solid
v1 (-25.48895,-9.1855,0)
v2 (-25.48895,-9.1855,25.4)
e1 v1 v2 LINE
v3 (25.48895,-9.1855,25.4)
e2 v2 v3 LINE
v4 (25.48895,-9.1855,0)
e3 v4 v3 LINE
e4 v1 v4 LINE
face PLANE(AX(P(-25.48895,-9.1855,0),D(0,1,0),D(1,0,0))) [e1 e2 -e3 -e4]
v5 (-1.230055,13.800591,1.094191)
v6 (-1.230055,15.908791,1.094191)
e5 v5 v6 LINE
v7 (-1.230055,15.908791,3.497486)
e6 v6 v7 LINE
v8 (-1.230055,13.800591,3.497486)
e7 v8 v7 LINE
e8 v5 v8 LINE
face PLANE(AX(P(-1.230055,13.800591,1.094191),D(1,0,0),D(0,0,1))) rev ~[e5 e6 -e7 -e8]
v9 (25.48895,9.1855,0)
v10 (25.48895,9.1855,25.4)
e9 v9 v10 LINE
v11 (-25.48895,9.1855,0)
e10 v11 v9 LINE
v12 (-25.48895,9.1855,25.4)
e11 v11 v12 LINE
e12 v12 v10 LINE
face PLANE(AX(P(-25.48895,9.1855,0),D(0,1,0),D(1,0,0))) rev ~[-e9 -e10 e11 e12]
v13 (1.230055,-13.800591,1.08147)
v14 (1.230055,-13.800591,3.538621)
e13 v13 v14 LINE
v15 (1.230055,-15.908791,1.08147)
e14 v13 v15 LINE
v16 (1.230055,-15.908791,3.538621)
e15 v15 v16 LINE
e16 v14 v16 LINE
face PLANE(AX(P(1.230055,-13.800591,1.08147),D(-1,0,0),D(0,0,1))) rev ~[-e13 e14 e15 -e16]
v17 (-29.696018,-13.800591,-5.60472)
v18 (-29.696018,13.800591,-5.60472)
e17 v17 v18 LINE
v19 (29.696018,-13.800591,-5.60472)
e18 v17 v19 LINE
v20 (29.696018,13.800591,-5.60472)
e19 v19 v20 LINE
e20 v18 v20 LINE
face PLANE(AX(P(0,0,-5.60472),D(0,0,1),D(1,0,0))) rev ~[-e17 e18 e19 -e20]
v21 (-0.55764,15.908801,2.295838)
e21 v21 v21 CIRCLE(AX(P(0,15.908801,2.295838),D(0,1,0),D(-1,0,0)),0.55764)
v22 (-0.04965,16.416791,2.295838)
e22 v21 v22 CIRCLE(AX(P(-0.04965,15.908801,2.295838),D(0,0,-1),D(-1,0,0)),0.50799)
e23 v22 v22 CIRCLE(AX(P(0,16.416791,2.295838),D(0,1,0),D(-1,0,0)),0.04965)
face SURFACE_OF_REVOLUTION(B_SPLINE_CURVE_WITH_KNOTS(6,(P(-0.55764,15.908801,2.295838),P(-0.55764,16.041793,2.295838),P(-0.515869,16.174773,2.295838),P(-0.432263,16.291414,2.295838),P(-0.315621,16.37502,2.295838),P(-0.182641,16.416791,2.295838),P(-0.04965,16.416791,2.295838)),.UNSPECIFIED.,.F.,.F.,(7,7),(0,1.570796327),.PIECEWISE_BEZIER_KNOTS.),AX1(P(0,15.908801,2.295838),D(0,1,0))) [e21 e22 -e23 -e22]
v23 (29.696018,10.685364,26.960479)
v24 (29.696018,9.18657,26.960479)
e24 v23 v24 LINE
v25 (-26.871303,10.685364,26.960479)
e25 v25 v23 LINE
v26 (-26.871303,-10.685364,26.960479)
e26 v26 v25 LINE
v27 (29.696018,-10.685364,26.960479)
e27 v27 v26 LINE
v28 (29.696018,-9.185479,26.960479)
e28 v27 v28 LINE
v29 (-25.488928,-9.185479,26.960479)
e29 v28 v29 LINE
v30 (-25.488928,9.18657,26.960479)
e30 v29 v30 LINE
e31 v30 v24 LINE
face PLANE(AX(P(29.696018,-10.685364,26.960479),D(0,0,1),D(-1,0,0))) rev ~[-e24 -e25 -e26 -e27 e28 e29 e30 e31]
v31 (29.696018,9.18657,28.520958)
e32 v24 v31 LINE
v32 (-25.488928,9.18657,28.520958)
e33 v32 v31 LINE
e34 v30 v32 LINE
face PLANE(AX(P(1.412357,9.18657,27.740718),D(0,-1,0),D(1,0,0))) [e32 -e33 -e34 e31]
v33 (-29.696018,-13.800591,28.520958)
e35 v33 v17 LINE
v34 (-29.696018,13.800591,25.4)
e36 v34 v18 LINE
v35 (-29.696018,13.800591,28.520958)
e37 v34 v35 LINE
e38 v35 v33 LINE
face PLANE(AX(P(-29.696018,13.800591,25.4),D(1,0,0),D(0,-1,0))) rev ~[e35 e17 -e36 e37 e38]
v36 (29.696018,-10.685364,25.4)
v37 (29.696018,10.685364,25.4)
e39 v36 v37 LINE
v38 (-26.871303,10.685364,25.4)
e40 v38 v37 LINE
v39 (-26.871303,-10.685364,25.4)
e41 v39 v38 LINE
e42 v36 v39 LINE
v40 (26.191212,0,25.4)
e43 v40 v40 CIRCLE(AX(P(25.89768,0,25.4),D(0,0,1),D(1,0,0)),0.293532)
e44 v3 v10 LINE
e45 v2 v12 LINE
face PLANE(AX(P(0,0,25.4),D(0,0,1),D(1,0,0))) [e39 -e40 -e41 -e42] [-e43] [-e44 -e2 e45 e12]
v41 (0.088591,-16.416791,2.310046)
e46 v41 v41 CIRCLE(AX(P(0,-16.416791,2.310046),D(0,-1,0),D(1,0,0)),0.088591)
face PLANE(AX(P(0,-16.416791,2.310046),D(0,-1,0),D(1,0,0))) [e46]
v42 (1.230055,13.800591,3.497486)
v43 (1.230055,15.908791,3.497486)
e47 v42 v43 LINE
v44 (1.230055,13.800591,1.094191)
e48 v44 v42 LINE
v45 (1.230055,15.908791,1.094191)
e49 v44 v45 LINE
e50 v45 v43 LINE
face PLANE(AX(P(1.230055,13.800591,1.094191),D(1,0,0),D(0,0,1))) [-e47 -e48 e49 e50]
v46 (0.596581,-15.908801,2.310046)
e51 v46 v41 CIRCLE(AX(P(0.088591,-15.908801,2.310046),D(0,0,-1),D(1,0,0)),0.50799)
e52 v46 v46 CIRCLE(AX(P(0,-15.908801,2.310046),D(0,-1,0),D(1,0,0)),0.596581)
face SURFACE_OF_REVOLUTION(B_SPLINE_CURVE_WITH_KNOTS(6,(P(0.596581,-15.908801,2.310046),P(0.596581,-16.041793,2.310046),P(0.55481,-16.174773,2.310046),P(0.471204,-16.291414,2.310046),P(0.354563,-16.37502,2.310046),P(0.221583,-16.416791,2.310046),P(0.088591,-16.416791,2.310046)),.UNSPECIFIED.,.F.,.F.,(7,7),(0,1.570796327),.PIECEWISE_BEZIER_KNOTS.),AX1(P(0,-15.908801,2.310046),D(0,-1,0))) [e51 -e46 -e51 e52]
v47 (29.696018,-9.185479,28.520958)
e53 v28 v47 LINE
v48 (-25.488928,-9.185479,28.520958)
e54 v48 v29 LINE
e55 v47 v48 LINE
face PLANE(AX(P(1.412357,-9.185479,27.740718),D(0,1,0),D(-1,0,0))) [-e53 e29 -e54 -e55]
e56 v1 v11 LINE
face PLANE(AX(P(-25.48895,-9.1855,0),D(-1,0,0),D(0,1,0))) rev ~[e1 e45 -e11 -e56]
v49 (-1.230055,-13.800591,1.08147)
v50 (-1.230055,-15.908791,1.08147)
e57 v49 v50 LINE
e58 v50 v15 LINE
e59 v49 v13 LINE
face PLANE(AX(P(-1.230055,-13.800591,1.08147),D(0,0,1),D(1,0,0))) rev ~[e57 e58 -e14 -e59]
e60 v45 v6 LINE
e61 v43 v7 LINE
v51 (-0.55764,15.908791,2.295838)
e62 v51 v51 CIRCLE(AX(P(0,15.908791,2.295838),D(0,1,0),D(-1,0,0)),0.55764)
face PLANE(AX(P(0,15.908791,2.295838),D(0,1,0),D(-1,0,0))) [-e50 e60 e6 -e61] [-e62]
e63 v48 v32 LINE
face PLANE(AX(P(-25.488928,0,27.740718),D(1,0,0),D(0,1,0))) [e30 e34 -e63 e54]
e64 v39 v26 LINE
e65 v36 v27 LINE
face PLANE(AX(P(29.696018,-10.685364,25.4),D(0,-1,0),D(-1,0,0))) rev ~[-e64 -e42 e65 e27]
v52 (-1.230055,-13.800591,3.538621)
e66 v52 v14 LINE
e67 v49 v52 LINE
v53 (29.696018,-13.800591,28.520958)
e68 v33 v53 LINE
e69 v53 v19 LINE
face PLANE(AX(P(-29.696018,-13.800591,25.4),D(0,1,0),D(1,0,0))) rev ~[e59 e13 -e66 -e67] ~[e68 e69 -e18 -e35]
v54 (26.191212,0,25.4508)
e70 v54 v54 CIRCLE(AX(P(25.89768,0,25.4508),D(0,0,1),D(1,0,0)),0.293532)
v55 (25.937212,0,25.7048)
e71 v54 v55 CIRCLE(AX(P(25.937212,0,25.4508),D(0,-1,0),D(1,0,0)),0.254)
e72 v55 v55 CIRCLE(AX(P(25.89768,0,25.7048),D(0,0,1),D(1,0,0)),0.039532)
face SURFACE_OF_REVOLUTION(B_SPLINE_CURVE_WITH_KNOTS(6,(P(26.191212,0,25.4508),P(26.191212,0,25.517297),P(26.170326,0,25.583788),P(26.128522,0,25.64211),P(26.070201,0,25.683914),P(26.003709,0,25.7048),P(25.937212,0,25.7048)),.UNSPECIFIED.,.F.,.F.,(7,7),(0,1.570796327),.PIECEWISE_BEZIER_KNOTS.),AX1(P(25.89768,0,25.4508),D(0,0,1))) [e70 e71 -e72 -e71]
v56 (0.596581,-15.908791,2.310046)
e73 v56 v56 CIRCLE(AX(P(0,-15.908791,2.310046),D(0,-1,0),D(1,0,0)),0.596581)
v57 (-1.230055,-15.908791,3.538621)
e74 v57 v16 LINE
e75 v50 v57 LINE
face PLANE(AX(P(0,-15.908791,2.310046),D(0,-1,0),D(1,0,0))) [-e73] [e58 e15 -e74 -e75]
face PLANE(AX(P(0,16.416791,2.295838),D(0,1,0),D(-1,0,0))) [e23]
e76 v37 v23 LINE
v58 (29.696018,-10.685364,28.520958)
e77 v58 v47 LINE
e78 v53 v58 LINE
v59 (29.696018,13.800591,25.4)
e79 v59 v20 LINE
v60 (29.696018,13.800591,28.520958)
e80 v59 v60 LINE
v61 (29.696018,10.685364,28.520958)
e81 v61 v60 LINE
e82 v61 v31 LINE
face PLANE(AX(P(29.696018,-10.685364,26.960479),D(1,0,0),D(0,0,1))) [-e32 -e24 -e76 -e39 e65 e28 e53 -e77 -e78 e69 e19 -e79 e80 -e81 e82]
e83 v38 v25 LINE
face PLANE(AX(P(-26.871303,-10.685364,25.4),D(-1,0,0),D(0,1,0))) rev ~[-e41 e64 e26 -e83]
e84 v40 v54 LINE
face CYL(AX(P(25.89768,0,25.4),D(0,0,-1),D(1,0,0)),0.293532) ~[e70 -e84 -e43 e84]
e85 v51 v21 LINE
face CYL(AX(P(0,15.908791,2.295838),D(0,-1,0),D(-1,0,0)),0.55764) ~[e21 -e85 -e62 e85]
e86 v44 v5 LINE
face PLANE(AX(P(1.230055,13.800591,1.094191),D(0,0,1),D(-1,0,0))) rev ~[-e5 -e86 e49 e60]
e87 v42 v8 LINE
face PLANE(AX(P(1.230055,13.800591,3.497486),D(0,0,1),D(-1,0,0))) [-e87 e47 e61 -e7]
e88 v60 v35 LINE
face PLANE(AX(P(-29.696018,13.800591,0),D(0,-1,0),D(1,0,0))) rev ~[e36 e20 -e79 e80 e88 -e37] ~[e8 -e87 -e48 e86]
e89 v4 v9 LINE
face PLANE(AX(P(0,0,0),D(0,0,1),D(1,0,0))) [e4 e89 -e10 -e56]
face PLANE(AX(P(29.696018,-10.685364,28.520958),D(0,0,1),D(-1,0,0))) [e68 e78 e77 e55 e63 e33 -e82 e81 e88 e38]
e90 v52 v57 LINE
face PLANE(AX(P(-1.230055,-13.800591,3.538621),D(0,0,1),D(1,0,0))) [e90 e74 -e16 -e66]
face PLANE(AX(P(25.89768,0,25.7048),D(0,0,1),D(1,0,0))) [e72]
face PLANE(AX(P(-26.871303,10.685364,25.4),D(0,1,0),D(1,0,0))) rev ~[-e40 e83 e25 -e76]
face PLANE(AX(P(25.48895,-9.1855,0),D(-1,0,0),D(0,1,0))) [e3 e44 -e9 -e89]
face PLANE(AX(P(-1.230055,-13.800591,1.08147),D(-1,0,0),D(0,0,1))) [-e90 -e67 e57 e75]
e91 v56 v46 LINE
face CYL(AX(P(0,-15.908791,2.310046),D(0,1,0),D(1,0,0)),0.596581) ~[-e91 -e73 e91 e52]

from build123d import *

# Parameters (mm, degrees)
F1_W      = 59.3920350075
F1_H      = 27.6011824608
F1_W_2    = 50.9779006243
F1_H_2    = 18.371000886
F2_DEPTH  = 25.4
F0_W      = 59.3920350075
F0_H      = 27.6011824608
F3_DEPTH  = 5.604719976
F18_DEPTH = 3.1209578738
F6_W      = 56.5673206002
F6_H      = 1.5604789369
F7_DEPTH  = 1.4987937175
F8_W      = 56.5673206002
F8_H      = 1.5604789369
F19_DEPTH = 1.4998847619
F5_W      = 21.3707275689
F5_H      = 1.5604789369
F9_DEPTH  = 1.382375136
F20_R     = 0.2935322564
F10_DEPTH = 0.3048
F21_R     = 0.254
F22_W     = 2.4601090699
F22_H     = 2.4032953017
F11_DEPTH = 2.1082
F12_R     = 0.5576398104
F13_DEPTH = 0.508
F14_R     = 0.50799
F23_W     = 2.4601090699
F23_H     = 2.4571502453
F15_DEPTH = 2.1082
F24_R     = 0.5965812211
F16_DEPTH = 0.508
F17_R     = 0.50799


# Not quite as in the source:
# - a fillet or chamfer is up to 0.001 mm smaller than in the source, because OpenCascade refuses the exact size


with BuildPart() as f2:
    # F1 (on face) → F2 (new body)
    with BuildSketch(Plane.XY):
        Rectangle(F1_W, F1_H)
        Rectangle(F1_W_2, F1_H_2, mode=Mode.SUBTRACT)
    extrude(amount=F2_DEPTH)

    # F0 (on Top) → F3 (join)
    with BuildSketch(Plane.XY):
        Rectangle(F0_W, F0_H)
    extrude(amount=-F3_DEPTH)

    # F4 (on face) → F18 (join)
    with BuildSketch(Plane.XY.offset(25.4)):
        Polygon((29.6960175037, -13.8005912304), (29.6960175037, -10.6853637844), (-26.8713030964, -10.6853637844), (-26.8713030964, 10.6853637844), (29.6960175037, 10.6853637844), (29.6960175037, 13.8005912304), (-29.6960175037, 13.8005912304), (-29.6960175037, -13.8005912304), align=None)
    extrude(amount=F18_DEPTH)

    # F6 (on face) → F7 (join)
    with BuildSketch(Plane.XZ.offset(-10.6853637844)):
        with Locations((1.4123572037, 27.7407184053)):
            Rectangle(F6_W, F6_H)
    extrude(amount=F7_DEPTH)

    # F8 (on face) → F19 (join)
    with BuildSketch(Plane(origin=(0, -10.6853637844, 0), x_dir=(-1, 0, 0), z_dir=(0, 1, 0))):
        with Locations((-1.4123572037, 27.7407184053)):
            Rectangle(F8_W, F8_H)
    extrude(amount=F19_DEPTH)

    # F5 (on face) → F9 (join)
    with BuildSketch(Plane.YZ.offset(-26.8713030964)):
        with Locations((0, 27.7407184053)):
            Rectangle(F5_W, F5_H)
    extrude(amount=F9_DEPTH)

    # F20 (on face) → F10 (join)
    with BuildSketch(Plane.XY.offset(25.4)):
        with Locations((25.8976798505, 0)):
            Circle(F20_R)
    extrude(amount=F10_DEPTH)

    # F21
    f21_edges = [f2.edges().sort_by_distance(p)[0] for p in [
        (25.604148, 0, 25.7048),
    ]]
    fillet(f21_edges, radius=F21_R)

    # F22 (on face) → F11 (join)
    with BuildSketch(Plane(origin=(0, 13.8005912304, 0), x_dir=(-1, 0, 0), z_dir=(0, 1, 0))):
        with Locations((0, 2.2958383197)):
            Rectangle(F22_W, F22_H)
    extrude(amount=F11_DEPTH)

    # F12 (on face) → F13 (join)
    with BuildSketch(Plane(origin=(0, 15.9087912304, 0), x_dir=(-1, 0, 0), z_dir=(0, 1, 0))):
        with Locations((0, 2.2958383197)):
            Circle(F12_R)
    extrude(amount=F13_DEPTH)

    # F14 (radius 0.508 in the source; OpenCascade refuses exactly that, so slightly less here)
    f14_edges = [f2.edges().sort_by_distance(p)[0] for p in [
        (0.55764, 16.416791, 2.295838),
    ]]
    fillet(f14_edges, radius=F14_R)

    # F23 (on face) → F15 (join)
    with BuildSketch(Plane.XZ.offset(13.8005912304)):
        with Locations((0, 2.3100455292)):
            Rectangle(F23_W, F23_H)
    extrude(amount=F15_DEPTH)

    # F24 (on face) → F16 (join)
    with BuildSketch(Plane.XZ.offset(15.9087912304)):
        with Locations((0, 2.3100455292)):
            Circle(F24_R)
    extrude(amount=F16_DEPTH)

    # F17 (radius 0.508 in the source; OpenCascade refuses exactly that, so slightly less here)
    f17_edges = [f2.edges().sort_by_distance(p)[0] for p in [
        (-0.596581, -16.416791, 2.310046),
    ]]
    fillet(f17_edges, radius=F17_R)


solid = f2.part
